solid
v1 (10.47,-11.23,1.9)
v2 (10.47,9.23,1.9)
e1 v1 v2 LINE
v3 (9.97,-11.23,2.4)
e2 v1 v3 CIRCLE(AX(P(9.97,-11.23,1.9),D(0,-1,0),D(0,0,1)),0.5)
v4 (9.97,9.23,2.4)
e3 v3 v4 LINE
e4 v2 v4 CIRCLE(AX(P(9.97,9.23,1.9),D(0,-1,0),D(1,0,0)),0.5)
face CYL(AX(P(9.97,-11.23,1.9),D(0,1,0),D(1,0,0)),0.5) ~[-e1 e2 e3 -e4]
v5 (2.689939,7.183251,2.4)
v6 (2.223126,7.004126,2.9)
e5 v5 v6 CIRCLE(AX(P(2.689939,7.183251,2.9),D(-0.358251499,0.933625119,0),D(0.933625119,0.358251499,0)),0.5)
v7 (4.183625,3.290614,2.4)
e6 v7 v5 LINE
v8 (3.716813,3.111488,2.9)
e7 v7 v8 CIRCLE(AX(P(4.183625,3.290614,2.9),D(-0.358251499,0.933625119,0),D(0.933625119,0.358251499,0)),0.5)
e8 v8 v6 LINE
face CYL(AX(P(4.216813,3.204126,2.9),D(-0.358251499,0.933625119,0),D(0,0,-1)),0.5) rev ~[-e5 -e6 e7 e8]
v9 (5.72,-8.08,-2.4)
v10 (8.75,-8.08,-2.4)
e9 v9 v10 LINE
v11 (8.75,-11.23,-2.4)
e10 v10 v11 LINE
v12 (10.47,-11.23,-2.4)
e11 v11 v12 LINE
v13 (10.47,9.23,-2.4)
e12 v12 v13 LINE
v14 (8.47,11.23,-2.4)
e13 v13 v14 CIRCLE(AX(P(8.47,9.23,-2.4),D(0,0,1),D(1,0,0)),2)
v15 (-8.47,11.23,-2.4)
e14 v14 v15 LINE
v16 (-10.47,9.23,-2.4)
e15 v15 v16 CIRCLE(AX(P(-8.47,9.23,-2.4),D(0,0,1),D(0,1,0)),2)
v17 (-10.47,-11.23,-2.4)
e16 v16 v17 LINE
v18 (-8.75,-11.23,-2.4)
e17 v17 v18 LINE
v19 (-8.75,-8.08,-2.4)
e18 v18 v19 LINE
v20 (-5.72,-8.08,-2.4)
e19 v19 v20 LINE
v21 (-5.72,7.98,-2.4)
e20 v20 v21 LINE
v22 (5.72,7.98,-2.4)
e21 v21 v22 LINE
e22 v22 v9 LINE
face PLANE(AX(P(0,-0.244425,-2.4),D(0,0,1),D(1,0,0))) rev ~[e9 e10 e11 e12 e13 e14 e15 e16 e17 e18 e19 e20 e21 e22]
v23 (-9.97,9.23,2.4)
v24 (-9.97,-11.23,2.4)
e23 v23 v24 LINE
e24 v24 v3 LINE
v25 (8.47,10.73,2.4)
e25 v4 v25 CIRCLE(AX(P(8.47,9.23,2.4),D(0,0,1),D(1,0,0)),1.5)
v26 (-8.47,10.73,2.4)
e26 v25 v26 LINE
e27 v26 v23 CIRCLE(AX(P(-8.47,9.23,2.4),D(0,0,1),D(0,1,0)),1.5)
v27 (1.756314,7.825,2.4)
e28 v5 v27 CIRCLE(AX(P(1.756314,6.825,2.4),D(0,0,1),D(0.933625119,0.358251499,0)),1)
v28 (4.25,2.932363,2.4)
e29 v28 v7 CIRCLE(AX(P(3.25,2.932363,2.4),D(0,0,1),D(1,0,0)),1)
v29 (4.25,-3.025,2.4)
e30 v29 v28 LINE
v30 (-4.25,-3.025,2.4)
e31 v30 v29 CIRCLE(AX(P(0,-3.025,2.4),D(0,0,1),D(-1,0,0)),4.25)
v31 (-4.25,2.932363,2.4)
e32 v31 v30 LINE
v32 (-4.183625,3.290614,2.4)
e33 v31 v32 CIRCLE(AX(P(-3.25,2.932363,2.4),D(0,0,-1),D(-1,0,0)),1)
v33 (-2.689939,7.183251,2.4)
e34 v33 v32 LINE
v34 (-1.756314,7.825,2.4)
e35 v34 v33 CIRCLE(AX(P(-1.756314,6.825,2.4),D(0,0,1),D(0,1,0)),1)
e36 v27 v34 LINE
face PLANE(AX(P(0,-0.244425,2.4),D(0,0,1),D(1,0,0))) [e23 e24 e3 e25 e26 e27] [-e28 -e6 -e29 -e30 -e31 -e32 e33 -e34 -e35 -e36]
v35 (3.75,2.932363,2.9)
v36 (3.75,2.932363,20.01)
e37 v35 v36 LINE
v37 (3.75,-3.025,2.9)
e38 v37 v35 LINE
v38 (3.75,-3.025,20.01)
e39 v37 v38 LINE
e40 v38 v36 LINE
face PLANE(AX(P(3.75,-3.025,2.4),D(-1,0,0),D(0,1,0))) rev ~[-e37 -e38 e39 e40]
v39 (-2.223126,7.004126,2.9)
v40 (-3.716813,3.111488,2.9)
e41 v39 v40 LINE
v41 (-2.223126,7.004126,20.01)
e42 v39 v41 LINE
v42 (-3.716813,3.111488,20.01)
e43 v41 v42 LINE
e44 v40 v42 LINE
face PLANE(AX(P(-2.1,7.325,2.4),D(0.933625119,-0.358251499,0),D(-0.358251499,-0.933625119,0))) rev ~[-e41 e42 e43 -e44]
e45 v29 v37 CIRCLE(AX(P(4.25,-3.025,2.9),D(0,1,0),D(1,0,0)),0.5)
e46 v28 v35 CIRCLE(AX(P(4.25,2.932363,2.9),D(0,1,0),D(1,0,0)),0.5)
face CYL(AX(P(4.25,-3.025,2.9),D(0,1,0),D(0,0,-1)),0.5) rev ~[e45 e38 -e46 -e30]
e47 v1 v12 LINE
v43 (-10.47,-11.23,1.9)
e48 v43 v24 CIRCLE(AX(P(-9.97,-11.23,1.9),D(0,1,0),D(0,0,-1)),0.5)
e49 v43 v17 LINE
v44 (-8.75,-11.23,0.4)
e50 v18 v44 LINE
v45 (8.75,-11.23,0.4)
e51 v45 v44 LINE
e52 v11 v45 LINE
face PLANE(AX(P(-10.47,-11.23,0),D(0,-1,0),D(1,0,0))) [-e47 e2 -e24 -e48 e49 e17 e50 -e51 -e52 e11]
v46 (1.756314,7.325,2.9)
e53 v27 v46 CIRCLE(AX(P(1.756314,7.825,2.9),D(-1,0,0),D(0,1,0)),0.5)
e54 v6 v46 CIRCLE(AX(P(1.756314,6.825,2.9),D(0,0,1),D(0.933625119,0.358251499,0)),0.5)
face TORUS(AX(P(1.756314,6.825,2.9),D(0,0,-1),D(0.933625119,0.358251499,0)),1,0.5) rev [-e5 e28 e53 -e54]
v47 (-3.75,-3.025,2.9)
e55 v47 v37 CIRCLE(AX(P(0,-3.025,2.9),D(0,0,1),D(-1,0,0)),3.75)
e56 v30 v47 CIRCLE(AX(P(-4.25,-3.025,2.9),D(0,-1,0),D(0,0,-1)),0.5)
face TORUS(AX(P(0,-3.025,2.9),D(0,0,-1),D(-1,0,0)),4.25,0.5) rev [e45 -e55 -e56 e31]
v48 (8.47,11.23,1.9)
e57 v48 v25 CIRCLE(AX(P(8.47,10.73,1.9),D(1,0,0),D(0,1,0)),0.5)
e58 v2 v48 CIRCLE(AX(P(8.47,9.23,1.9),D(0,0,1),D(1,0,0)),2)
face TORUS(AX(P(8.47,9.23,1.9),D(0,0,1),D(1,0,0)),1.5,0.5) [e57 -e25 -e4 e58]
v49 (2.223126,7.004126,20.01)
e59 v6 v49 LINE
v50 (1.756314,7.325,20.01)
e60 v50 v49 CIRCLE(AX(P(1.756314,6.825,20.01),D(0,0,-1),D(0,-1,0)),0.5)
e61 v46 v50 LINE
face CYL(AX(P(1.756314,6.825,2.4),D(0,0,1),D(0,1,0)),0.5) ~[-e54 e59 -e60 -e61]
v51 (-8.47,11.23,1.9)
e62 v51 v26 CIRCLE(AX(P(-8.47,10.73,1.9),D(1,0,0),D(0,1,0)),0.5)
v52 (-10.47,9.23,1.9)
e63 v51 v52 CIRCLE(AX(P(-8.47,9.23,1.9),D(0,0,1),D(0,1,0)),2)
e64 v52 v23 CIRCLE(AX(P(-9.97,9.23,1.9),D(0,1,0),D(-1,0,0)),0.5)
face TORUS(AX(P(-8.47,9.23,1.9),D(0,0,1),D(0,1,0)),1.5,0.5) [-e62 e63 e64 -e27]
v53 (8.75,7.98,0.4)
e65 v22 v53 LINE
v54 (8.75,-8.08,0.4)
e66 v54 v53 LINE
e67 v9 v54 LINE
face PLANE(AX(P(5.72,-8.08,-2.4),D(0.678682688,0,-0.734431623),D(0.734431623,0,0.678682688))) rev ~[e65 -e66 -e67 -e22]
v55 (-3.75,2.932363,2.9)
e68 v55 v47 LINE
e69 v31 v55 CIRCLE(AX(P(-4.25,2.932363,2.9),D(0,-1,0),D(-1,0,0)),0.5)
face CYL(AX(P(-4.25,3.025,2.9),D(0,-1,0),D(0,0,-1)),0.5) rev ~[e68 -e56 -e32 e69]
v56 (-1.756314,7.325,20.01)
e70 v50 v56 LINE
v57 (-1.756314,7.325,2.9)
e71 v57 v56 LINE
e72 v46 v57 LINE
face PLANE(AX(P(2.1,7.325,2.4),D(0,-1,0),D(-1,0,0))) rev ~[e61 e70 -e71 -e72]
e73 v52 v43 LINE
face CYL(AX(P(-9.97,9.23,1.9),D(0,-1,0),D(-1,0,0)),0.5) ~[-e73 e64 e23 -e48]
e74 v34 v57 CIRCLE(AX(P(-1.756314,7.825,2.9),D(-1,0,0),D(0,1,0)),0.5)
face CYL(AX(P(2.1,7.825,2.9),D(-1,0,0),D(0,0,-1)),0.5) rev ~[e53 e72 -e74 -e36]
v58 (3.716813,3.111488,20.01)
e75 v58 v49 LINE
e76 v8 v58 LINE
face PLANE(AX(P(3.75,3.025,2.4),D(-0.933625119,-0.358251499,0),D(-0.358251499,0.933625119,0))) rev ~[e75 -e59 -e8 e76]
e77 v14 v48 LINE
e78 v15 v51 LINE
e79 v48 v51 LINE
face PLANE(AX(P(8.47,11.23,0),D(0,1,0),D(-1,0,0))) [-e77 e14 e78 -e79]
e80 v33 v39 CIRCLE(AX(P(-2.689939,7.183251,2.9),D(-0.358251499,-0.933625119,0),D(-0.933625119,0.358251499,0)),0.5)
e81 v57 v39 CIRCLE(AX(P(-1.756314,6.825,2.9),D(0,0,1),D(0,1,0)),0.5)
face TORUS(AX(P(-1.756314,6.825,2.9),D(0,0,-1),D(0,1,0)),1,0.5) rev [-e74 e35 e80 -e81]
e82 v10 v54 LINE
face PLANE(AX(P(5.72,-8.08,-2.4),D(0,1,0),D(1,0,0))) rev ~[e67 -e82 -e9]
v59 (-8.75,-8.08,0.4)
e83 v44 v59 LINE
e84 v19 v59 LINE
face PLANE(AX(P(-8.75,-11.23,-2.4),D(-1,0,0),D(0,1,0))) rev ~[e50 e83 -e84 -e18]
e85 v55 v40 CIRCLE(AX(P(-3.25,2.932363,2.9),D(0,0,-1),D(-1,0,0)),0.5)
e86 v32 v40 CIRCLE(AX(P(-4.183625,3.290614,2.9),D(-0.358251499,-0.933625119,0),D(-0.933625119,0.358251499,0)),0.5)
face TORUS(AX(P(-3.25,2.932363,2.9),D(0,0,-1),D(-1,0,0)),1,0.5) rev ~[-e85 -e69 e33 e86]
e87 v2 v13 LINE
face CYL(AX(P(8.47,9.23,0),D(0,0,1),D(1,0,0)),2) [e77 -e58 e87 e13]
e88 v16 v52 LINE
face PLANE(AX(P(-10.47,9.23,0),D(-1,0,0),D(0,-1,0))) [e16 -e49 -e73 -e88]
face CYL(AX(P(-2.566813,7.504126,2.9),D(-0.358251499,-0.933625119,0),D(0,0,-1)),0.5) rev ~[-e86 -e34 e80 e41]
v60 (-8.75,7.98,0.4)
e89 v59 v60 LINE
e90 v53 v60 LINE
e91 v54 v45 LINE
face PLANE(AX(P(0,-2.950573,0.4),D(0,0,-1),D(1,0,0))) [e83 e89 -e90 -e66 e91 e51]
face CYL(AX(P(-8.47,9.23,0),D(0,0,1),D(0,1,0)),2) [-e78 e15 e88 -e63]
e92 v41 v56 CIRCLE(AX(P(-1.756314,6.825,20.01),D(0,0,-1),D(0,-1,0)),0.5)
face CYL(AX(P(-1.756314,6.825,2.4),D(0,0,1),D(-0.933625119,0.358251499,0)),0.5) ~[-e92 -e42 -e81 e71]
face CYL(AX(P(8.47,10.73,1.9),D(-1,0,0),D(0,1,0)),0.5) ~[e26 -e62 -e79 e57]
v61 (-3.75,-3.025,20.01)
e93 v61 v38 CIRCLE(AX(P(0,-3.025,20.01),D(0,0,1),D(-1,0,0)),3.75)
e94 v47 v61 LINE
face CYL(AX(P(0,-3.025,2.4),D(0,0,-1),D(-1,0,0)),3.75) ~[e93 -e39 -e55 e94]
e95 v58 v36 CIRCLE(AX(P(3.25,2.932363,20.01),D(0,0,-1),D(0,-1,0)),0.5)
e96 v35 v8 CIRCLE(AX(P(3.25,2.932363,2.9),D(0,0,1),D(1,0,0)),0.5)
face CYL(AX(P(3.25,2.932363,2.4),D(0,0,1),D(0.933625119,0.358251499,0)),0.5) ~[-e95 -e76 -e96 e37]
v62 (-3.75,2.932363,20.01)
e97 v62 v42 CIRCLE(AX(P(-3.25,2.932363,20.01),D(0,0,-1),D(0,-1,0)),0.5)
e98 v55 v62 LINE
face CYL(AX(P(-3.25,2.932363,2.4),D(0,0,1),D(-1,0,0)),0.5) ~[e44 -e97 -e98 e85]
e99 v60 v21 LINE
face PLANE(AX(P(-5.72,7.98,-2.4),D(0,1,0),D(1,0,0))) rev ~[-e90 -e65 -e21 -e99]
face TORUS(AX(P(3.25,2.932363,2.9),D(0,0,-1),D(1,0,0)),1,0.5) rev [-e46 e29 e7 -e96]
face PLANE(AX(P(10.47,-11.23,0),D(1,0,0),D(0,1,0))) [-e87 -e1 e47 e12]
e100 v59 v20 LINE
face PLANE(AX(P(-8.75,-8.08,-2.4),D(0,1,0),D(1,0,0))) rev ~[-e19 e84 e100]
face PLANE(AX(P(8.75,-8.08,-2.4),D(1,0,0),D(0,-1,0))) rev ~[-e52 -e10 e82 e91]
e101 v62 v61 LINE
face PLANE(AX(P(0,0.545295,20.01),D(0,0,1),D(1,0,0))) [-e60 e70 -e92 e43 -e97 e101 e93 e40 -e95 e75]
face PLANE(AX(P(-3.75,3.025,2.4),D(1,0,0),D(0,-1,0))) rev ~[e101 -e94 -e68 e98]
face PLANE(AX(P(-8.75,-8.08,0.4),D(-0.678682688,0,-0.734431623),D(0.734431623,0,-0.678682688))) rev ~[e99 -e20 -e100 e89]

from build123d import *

# Parameters (mm, degrees)
F1_DEPTH = 2.4
F3_DEPTH = 17.61
F5_DEPTH = 2.8
F7_DEPTH = 16.06
F8_R     = 0.5


with BuildPart() as f1:
    # F0 (on Top) → F1 (new body, symmetric)
    with BuildSketch(Plane.XY):
        with BuildLine():
            ThreePointArc((10.47, 9.23), (9.8842135624, 10.6442135624), (8.47, 11.23))
            Line((8.47, 11.23), (-8.47, 11.23))
            ThreePointArc((-8.47, 11.23), (-9.8842135624, 10.6442135624), (-10.47, 9.23))
            Line((-10.47, 9.23), (-10.47, -11.23))
            Line((-10.47, -11.23), (10.47, -11.23))
            Line((10.47, -11.23), (10.47, 9.23))
        make_face()
    extrude(amount=F1_DEPTH, both=True)

    # F2 (on face) → F3 (join)
    with BuildSketch(Plane.XY.offset(2.4)):
        with BuildLine():
            ThreePointArc((-3.75, -3.025), (0, -6.775), (3.75, -3.025))
            Line((3.75, -3.025), (3.75, 3.025))
            Line((3.75, 3.025), (2.1, 7.325))
            Line((2.1, 7.325), (-2.1, 7.325))
            Line((-2.1, 7.325), (-3.75, 3.025))
            Line((-3.75, 3.025), (-3.75, -3.025))
        make_face()
    extrude(amount=F3_DEPTH)

    # F4 (on face) → F5 (cut)
    with BuildSketch(Plane(origin=(0, 0, -2.4), x_dir=(1, 0, 0), z_dir=(0, 0, -1))):
        Polygon((-5.72, 8.08), (-5.72, -7.98), (5.72, -7.98), (5.72, 8.08), (8.75, 8.08), (8.75, 11.23), (-8.75, 11.23), (-8.75, 8.08), align=None)
    extrude(amount=-F5_DEPTH, mode=Mode.SUBTRACT)

    # F6 (on face) → F7 (cut, through all)
    with BuildSketch(Plane.XZ.offset(8.08)):
        Polygon((-8.75, 0.4), (-5.72, -2.4), (-5.72, 0.4), align=None)
        Polygon((5.72, -2.4), (8.75, 0.4), (5.72, 0.4), align=None)
    extrude(amount=-F7_DEPTH, mode=Mode.SUBTRACT)

    # F8
    f8_edges = [f1.edges().sort_by_distance(p)[0] for p in [
        (10.47, -1, 2.4),
        (3.75, 3.025, 11.205),
        (-3.75, 3.025, 11.205),
        (-2.1, 7.325, 11.205),
        (2.1, 7.325, 11.205),
        (0, -6.775, 2.4),
        (9.884214, 10.644214, 2.4),
        (-10.47, -1, 2.4),
        (-9.884214, 10.644214, 2.4),
        (0, 11.23, 2.4),
        (3.75, 0, 2.4),
        (2.925, 5.175, 2.4),
        (0, 7.325, 2.4),
        (-2.925, 5.175, 2.4),
        (-3.75, 0, 2.4),
    ]]
    fillet(f8_edges, radius=F8_R)


solid = f1.part
